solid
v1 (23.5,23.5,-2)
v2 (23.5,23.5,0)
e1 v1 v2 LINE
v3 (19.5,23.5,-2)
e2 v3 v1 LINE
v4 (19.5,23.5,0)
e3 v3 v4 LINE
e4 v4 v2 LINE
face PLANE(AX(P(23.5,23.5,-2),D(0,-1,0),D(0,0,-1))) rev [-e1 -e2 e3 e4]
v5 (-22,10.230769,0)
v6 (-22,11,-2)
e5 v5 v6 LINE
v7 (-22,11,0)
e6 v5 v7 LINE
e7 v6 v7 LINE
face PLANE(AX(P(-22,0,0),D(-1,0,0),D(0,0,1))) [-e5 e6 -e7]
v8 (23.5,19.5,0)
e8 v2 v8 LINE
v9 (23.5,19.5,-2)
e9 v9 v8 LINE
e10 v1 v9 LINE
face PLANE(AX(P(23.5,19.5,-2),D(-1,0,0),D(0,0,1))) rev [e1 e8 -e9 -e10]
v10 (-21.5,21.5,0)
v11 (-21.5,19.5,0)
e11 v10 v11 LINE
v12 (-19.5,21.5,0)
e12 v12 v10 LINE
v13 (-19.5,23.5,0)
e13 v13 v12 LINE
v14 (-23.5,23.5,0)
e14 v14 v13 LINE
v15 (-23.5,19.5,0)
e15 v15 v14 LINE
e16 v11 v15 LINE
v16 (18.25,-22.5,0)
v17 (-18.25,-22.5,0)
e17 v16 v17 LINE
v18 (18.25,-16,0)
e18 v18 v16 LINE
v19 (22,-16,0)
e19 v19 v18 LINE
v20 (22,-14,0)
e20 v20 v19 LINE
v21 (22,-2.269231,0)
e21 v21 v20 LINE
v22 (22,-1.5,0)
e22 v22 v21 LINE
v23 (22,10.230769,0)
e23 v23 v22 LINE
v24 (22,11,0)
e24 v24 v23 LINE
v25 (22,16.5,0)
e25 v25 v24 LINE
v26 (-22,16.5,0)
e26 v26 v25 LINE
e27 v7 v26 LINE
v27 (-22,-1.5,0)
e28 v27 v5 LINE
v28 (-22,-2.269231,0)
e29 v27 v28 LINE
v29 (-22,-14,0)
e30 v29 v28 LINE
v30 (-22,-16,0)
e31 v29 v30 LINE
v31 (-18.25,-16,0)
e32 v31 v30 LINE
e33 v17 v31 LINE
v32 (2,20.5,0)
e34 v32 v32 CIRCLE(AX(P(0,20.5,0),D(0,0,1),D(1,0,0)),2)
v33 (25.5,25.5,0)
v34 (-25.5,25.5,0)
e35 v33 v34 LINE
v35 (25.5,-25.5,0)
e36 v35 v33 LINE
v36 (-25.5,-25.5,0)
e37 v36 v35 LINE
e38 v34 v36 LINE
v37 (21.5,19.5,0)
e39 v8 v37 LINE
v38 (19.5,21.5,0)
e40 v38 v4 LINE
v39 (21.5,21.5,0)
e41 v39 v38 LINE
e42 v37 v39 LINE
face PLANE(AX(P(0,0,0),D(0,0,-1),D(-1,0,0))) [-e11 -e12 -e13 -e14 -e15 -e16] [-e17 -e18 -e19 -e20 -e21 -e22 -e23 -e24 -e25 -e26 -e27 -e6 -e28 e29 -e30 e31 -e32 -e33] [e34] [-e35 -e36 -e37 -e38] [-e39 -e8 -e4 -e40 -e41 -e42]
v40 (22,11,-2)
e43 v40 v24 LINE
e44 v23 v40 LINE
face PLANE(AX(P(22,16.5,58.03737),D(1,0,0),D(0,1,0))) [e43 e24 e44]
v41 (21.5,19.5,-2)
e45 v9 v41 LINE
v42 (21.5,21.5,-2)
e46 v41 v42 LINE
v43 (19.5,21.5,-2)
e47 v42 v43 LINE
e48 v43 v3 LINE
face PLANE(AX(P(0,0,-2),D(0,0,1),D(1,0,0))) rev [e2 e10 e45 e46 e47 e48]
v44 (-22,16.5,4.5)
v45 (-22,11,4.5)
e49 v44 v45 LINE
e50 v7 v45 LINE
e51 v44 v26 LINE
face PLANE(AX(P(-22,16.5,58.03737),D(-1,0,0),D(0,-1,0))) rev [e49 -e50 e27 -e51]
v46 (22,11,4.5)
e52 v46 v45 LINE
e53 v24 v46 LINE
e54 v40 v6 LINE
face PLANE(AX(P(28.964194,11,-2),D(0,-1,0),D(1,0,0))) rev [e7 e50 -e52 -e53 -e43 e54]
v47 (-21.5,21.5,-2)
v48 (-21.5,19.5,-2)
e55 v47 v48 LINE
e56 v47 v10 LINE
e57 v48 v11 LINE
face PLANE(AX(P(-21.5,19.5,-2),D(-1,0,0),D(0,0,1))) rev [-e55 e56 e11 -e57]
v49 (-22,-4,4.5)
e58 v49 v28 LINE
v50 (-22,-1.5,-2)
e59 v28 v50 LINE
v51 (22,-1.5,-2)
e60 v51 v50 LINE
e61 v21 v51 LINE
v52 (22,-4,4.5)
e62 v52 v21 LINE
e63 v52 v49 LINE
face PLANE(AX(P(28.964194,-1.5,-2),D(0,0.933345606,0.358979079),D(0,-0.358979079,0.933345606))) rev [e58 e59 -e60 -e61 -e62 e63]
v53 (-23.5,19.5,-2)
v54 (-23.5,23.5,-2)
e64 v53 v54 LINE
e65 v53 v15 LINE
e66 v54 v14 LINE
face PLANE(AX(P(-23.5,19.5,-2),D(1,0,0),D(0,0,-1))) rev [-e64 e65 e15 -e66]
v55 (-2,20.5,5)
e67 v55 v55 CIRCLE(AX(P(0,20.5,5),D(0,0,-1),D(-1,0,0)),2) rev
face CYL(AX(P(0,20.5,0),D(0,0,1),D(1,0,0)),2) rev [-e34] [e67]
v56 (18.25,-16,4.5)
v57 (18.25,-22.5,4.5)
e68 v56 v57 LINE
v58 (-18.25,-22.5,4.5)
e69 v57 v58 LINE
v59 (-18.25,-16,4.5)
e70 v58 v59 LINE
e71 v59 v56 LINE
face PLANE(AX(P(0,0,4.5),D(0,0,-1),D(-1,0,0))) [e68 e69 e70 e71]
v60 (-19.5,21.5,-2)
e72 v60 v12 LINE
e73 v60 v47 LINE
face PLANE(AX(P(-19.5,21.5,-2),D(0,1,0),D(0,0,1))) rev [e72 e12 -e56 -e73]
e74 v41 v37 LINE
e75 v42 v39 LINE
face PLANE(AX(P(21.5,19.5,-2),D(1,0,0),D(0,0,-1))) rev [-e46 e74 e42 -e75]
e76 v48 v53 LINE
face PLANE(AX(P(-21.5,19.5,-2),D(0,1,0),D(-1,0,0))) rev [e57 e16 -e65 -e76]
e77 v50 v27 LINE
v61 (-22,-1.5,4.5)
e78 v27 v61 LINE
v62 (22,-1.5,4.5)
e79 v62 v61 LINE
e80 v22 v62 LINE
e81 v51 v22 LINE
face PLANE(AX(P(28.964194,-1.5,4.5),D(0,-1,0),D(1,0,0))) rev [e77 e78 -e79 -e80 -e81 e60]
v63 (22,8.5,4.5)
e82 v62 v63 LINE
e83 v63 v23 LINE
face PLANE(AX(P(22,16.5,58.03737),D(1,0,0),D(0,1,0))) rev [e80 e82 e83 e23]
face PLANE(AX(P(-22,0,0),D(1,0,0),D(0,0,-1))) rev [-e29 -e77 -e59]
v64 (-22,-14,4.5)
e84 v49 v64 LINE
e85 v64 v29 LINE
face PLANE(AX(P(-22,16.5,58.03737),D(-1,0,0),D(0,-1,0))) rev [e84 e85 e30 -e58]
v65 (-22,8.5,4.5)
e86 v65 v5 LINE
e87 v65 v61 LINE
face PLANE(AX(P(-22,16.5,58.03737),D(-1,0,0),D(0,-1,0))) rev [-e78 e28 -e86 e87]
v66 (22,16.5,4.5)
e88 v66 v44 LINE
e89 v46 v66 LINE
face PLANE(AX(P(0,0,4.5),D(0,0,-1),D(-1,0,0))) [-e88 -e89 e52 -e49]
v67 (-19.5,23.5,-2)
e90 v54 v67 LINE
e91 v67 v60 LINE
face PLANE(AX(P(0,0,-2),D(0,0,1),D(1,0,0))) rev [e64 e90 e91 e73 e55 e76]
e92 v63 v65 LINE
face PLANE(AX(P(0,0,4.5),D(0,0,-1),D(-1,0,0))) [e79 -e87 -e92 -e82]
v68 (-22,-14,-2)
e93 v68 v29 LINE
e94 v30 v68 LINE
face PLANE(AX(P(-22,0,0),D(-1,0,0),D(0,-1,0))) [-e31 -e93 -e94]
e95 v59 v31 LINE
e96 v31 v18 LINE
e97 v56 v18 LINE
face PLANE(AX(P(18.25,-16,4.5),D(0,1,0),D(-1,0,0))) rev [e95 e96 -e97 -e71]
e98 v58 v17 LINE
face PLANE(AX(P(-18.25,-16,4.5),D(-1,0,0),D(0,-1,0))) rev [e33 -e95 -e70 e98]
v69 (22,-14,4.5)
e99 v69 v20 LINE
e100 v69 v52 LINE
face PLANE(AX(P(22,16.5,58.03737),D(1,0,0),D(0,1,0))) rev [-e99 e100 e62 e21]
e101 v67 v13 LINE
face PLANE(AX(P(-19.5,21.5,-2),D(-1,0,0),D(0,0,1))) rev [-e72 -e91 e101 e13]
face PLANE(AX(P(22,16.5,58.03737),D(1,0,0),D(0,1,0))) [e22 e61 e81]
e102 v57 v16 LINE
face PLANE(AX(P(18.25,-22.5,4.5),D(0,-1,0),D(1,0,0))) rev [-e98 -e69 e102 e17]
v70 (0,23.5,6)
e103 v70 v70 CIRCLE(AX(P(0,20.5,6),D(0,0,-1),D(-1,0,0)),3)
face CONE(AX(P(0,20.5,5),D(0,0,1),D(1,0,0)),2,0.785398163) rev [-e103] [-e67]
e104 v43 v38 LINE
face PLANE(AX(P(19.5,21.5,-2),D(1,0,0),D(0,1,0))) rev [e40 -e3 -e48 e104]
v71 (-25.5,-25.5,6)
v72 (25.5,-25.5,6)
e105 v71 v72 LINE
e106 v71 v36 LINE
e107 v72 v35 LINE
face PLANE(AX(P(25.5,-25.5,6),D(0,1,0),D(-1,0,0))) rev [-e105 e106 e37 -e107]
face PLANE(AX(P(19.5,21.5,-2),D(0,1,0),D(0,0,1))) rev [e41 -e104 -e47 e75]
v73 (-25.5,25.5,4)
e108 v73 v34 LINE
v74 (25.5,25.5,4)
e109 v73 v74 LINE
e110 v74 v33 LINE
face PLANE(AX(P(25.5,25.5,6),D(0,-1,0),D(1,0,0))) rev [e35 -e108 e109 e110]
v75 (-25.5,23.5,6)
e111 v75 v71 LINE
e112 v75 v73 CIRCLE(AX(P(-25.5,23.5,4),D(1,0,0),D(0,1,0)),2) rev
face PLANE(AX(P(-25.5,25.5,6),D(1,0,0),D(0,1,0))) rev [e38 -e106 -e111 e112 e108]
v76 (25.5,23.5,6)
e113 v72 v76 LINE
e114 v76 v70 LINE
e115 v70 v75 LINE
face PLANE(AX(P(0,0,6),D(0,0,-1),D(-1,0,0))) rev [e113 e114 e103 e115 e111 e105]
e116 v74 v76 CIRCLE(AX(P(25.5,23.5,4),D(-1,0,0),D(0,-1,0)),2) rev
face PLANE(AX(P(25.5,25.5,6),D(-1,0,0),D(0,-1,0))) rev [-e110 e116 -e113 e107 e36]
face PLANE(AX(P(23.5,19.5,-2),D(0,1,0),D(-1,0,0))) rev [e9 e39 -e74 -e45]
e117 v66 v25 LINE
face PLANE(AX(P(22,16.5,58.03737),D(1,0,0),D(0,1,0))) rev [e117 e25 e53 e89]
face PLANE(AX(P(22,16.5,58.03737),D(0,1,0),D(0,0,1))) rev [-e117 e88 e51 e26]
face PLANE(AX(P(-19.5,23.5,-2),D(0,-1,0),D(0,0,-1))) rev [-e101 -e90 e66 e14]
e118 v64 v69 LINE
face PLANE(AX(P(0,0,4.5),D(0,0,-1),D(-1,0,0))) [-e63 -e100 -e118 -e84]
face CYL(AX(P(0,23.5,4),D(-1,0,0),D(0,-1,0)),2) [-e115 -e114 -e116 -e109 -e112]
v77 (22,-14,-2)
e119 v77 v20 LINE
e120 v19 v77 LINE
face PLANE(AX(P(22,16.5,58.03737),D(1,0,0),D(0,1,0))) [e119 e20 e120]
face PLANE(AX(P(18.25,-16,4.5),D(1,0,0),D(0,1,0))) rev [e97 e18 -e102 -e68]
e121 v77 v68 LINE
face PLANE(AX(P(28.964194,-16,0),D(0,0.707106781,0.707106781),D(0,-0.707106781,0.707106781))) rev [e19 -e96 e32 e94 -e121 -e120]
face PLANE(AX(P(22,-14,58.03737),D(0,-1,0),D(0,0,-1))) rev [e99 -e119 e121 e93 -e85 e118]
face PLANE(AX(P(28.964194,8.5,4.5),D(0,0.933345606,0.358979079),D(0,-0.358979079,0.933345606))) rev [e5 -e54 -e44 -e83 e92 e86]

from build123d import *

# Parameters (mm, degrees)
ESBO_O1_W                = 51
ESBO_O1_H                = 51
RESSALTO_EXTRUS_O1_DEPTH = 6
ESBO_O2_W                = 36.5
ESBO_O2_H                = 6.5
CORTE_EXTRUS_O1_DEPTH    = 4.5
ESBO_O3_R                = 2
CORTE_EXTRUS_O2_DEPTH    = 37.558172821
ESBO_O4_W                = 44
ESBO_O4_H                = 30.5
CORTE_EXTRUS_O3_DEPTH    = 4.5
FILETE1_R                = 2
CHANFRO1_SIZE            = 1
RESSALTO_EXTRUS_O2_DEPTH = 2
RESSALTO_EXTRUS_O3_REACH = 56.245


with BuildPart() as part:
    # Esboço1 → Ressalto-extrusão1 (new body)
    with BuildSketch(Plane.XY):
        Rectangle(ESBO_O1_W, ESBO_O1_H)
    extrude(amount=RESSALTO_EXTRUS_O1_DEPTH)

    # Esboço2 → Corte-extrusão1 (cut)
    with BuildSketch(Plane(origin=(0, 0, 0), x_dir=(-1, 0, 0), z_dir=(0, 0, -1))):
        with Locations((0, -19.25)):
            Rectangle(ESBO_O2_W, ESBO_O2_H)
    extrude(amount=-CORTE_EXTRUS_O1_DEPTH, mode=Mode.SUBTRACT)

    # Esboço3 → Corte-extrusão2 (cut, through all)
    with BuildSketch(Plane.XY.offset(6)):
        with Locations((0, 20.5)):
            Circle(ESBO_O3_R)
    extrude(amount=-CORTE_EXTRUS_O2_DEPTH, mode=Mode.SUBTRACT)

    # Esboço4 → Corte-extrusão3 (cut)
    with BuildSketch(Plane(origin=(0, 0, 0), x_dir=(-1, 0, 0), z_dir=(0, 0, -1))):
        with Locations((0, 1.25)):
            Rectangle(ESBO_O4_W, ESBO_O4_H)
    extrude(amount=-CORTE_EXTRUS_O3_DEPTH, mode=Mode.SUBTRACT)

    # Filete1
    filete1_edges = [part.edges().sort_by_distance(p)[0] for p in [
        (0, 25.5, 6),
    ]]
    fillet(filete1_edges, radius=FILETE1_R)

    # Chanfro1
    chanfro1_edges = [part.edges().sort_by_distance(p)[0] for p in [
        (-2, 20.5, 6),
    ]]
    chamfer(chanfro1_edges, length=CHANFRO1_SIZE - 0.0001)  # a hair under: the kernel refuses the full size

    # Esboço5 → Ressalto-extrusão2 (add)
    with BuildSketch(Plane(origin=(0, 0, 0), x_dir=(-1, 0, 0), z_dir=(0, 0, -1))):
        Polygon((-23.5, 19.5), (-21.5, 19.5), (-21.5, 21.5), (-19.5, 21.5), (-19.5, 23.5), (-23.5, 23.5), align=None)
        Polygon((21.5, 19.5), (23.5, 19.5), (23.5, 23.5), (19.5, 23.5), (19.5, 21.5), (21.5, 21.5), align=None)
    extrude(amount=RESSALTO_EXTRUS_O2_DEPTH)

    # Ressalto-extrusão3: up to this face of the body (flat: up to its plane)
    ressalto_extrus_o3_end = Plane(part.part.faces().sort_by_distance((22, 1.25, 2.25))[0])
    # Esboço6 → Ressalto-extrusão3 (add, up to the picked face)
    with BuildSketch(Plane(origin=(-22, 0, 0), x_dir=(0, 0, -1), z_dir=(1, 0, 0)), mode=Mode.PRIVATE) as ressalto_extrus_o3_sk1:
        Polygon((0, -16), (2, -14), (0, -14), align=None)
    ressalto_extrus_o3_tool1 = split(extrude(ressalto_extrus_o3_sk1.sketch, amount=RESSALTO_EXTRUS_O3_REACH, mode=Mode.PRIVATE), bisect_by=ressalto_extrus_o3_end, keep=Keep.BOTH, mode=Mode.PRIVATE)
    # Esboço6 → Ressalto-extrusão3 (add, up to the picked face)
    with BuildSketch(Plane(origin=(-22, 0, 0), x_dir=(0, 0, -1), z_dir=(1, 0, 0)), mode=Mode.PRIVATE) as ressalto_extrus_o3_sk2:
        Polygon((-4.5, -1.5), (2, -1.5), (-4.5, -4), align=None)
    ressalto_extrus_o3_tool2 = split(extrude(ressalto_extrus_o3_sk2.sketch, amount=RESSALTO_EXTRUS_O3_REACH, mode=Mode.PRIVATE), bisect_by=ressalto_extrus_o3_end, keep=Keep.BOTH, mode=Mode.PRIVATE)
    # Esboço6 → Ressalto-extrusão3 (add, up to the picked face)
    with BuildSketch(Plane(origin=(-22, 0, 0), x_dir=(0, 0, -1), z_dir=(1, 0, 0)), mode=Mode.PRIVATE) as ressalto_extrus_o3_sk3:
        Polygon((-4.5, 8.5), (2, 11), (-4.5, 11), align=None)
    ressalto_extrus_o3_tool3 = split(extrude(ressalto_extrus_o3_sk3.sketch, amount=RESSALTO_EXTRUS_O3_REACH, mode=Mode.PRIVATE), bisect_by=ressalto_extrus_o3_end, keep=Keep.BOTH, mode=Mode.PRIVATE)
    add(ressalto_extrus_o3_tool1.solids().sort_by(Axis((-22, -14.666667, -0.666667), (1, 0, 0)))[0])
    add(ressalto_extrus_o3_tool2.solids().sort_by(Axis((-22, -2.333333, 2.333333), (1, 0, 0)))[0])
    add(ressalto_extrus_o3_tool3.solids().sort_by(Axis((-22, 10.166667, 2.333333), (1, 0, 0)))[0])


solid = part.part
